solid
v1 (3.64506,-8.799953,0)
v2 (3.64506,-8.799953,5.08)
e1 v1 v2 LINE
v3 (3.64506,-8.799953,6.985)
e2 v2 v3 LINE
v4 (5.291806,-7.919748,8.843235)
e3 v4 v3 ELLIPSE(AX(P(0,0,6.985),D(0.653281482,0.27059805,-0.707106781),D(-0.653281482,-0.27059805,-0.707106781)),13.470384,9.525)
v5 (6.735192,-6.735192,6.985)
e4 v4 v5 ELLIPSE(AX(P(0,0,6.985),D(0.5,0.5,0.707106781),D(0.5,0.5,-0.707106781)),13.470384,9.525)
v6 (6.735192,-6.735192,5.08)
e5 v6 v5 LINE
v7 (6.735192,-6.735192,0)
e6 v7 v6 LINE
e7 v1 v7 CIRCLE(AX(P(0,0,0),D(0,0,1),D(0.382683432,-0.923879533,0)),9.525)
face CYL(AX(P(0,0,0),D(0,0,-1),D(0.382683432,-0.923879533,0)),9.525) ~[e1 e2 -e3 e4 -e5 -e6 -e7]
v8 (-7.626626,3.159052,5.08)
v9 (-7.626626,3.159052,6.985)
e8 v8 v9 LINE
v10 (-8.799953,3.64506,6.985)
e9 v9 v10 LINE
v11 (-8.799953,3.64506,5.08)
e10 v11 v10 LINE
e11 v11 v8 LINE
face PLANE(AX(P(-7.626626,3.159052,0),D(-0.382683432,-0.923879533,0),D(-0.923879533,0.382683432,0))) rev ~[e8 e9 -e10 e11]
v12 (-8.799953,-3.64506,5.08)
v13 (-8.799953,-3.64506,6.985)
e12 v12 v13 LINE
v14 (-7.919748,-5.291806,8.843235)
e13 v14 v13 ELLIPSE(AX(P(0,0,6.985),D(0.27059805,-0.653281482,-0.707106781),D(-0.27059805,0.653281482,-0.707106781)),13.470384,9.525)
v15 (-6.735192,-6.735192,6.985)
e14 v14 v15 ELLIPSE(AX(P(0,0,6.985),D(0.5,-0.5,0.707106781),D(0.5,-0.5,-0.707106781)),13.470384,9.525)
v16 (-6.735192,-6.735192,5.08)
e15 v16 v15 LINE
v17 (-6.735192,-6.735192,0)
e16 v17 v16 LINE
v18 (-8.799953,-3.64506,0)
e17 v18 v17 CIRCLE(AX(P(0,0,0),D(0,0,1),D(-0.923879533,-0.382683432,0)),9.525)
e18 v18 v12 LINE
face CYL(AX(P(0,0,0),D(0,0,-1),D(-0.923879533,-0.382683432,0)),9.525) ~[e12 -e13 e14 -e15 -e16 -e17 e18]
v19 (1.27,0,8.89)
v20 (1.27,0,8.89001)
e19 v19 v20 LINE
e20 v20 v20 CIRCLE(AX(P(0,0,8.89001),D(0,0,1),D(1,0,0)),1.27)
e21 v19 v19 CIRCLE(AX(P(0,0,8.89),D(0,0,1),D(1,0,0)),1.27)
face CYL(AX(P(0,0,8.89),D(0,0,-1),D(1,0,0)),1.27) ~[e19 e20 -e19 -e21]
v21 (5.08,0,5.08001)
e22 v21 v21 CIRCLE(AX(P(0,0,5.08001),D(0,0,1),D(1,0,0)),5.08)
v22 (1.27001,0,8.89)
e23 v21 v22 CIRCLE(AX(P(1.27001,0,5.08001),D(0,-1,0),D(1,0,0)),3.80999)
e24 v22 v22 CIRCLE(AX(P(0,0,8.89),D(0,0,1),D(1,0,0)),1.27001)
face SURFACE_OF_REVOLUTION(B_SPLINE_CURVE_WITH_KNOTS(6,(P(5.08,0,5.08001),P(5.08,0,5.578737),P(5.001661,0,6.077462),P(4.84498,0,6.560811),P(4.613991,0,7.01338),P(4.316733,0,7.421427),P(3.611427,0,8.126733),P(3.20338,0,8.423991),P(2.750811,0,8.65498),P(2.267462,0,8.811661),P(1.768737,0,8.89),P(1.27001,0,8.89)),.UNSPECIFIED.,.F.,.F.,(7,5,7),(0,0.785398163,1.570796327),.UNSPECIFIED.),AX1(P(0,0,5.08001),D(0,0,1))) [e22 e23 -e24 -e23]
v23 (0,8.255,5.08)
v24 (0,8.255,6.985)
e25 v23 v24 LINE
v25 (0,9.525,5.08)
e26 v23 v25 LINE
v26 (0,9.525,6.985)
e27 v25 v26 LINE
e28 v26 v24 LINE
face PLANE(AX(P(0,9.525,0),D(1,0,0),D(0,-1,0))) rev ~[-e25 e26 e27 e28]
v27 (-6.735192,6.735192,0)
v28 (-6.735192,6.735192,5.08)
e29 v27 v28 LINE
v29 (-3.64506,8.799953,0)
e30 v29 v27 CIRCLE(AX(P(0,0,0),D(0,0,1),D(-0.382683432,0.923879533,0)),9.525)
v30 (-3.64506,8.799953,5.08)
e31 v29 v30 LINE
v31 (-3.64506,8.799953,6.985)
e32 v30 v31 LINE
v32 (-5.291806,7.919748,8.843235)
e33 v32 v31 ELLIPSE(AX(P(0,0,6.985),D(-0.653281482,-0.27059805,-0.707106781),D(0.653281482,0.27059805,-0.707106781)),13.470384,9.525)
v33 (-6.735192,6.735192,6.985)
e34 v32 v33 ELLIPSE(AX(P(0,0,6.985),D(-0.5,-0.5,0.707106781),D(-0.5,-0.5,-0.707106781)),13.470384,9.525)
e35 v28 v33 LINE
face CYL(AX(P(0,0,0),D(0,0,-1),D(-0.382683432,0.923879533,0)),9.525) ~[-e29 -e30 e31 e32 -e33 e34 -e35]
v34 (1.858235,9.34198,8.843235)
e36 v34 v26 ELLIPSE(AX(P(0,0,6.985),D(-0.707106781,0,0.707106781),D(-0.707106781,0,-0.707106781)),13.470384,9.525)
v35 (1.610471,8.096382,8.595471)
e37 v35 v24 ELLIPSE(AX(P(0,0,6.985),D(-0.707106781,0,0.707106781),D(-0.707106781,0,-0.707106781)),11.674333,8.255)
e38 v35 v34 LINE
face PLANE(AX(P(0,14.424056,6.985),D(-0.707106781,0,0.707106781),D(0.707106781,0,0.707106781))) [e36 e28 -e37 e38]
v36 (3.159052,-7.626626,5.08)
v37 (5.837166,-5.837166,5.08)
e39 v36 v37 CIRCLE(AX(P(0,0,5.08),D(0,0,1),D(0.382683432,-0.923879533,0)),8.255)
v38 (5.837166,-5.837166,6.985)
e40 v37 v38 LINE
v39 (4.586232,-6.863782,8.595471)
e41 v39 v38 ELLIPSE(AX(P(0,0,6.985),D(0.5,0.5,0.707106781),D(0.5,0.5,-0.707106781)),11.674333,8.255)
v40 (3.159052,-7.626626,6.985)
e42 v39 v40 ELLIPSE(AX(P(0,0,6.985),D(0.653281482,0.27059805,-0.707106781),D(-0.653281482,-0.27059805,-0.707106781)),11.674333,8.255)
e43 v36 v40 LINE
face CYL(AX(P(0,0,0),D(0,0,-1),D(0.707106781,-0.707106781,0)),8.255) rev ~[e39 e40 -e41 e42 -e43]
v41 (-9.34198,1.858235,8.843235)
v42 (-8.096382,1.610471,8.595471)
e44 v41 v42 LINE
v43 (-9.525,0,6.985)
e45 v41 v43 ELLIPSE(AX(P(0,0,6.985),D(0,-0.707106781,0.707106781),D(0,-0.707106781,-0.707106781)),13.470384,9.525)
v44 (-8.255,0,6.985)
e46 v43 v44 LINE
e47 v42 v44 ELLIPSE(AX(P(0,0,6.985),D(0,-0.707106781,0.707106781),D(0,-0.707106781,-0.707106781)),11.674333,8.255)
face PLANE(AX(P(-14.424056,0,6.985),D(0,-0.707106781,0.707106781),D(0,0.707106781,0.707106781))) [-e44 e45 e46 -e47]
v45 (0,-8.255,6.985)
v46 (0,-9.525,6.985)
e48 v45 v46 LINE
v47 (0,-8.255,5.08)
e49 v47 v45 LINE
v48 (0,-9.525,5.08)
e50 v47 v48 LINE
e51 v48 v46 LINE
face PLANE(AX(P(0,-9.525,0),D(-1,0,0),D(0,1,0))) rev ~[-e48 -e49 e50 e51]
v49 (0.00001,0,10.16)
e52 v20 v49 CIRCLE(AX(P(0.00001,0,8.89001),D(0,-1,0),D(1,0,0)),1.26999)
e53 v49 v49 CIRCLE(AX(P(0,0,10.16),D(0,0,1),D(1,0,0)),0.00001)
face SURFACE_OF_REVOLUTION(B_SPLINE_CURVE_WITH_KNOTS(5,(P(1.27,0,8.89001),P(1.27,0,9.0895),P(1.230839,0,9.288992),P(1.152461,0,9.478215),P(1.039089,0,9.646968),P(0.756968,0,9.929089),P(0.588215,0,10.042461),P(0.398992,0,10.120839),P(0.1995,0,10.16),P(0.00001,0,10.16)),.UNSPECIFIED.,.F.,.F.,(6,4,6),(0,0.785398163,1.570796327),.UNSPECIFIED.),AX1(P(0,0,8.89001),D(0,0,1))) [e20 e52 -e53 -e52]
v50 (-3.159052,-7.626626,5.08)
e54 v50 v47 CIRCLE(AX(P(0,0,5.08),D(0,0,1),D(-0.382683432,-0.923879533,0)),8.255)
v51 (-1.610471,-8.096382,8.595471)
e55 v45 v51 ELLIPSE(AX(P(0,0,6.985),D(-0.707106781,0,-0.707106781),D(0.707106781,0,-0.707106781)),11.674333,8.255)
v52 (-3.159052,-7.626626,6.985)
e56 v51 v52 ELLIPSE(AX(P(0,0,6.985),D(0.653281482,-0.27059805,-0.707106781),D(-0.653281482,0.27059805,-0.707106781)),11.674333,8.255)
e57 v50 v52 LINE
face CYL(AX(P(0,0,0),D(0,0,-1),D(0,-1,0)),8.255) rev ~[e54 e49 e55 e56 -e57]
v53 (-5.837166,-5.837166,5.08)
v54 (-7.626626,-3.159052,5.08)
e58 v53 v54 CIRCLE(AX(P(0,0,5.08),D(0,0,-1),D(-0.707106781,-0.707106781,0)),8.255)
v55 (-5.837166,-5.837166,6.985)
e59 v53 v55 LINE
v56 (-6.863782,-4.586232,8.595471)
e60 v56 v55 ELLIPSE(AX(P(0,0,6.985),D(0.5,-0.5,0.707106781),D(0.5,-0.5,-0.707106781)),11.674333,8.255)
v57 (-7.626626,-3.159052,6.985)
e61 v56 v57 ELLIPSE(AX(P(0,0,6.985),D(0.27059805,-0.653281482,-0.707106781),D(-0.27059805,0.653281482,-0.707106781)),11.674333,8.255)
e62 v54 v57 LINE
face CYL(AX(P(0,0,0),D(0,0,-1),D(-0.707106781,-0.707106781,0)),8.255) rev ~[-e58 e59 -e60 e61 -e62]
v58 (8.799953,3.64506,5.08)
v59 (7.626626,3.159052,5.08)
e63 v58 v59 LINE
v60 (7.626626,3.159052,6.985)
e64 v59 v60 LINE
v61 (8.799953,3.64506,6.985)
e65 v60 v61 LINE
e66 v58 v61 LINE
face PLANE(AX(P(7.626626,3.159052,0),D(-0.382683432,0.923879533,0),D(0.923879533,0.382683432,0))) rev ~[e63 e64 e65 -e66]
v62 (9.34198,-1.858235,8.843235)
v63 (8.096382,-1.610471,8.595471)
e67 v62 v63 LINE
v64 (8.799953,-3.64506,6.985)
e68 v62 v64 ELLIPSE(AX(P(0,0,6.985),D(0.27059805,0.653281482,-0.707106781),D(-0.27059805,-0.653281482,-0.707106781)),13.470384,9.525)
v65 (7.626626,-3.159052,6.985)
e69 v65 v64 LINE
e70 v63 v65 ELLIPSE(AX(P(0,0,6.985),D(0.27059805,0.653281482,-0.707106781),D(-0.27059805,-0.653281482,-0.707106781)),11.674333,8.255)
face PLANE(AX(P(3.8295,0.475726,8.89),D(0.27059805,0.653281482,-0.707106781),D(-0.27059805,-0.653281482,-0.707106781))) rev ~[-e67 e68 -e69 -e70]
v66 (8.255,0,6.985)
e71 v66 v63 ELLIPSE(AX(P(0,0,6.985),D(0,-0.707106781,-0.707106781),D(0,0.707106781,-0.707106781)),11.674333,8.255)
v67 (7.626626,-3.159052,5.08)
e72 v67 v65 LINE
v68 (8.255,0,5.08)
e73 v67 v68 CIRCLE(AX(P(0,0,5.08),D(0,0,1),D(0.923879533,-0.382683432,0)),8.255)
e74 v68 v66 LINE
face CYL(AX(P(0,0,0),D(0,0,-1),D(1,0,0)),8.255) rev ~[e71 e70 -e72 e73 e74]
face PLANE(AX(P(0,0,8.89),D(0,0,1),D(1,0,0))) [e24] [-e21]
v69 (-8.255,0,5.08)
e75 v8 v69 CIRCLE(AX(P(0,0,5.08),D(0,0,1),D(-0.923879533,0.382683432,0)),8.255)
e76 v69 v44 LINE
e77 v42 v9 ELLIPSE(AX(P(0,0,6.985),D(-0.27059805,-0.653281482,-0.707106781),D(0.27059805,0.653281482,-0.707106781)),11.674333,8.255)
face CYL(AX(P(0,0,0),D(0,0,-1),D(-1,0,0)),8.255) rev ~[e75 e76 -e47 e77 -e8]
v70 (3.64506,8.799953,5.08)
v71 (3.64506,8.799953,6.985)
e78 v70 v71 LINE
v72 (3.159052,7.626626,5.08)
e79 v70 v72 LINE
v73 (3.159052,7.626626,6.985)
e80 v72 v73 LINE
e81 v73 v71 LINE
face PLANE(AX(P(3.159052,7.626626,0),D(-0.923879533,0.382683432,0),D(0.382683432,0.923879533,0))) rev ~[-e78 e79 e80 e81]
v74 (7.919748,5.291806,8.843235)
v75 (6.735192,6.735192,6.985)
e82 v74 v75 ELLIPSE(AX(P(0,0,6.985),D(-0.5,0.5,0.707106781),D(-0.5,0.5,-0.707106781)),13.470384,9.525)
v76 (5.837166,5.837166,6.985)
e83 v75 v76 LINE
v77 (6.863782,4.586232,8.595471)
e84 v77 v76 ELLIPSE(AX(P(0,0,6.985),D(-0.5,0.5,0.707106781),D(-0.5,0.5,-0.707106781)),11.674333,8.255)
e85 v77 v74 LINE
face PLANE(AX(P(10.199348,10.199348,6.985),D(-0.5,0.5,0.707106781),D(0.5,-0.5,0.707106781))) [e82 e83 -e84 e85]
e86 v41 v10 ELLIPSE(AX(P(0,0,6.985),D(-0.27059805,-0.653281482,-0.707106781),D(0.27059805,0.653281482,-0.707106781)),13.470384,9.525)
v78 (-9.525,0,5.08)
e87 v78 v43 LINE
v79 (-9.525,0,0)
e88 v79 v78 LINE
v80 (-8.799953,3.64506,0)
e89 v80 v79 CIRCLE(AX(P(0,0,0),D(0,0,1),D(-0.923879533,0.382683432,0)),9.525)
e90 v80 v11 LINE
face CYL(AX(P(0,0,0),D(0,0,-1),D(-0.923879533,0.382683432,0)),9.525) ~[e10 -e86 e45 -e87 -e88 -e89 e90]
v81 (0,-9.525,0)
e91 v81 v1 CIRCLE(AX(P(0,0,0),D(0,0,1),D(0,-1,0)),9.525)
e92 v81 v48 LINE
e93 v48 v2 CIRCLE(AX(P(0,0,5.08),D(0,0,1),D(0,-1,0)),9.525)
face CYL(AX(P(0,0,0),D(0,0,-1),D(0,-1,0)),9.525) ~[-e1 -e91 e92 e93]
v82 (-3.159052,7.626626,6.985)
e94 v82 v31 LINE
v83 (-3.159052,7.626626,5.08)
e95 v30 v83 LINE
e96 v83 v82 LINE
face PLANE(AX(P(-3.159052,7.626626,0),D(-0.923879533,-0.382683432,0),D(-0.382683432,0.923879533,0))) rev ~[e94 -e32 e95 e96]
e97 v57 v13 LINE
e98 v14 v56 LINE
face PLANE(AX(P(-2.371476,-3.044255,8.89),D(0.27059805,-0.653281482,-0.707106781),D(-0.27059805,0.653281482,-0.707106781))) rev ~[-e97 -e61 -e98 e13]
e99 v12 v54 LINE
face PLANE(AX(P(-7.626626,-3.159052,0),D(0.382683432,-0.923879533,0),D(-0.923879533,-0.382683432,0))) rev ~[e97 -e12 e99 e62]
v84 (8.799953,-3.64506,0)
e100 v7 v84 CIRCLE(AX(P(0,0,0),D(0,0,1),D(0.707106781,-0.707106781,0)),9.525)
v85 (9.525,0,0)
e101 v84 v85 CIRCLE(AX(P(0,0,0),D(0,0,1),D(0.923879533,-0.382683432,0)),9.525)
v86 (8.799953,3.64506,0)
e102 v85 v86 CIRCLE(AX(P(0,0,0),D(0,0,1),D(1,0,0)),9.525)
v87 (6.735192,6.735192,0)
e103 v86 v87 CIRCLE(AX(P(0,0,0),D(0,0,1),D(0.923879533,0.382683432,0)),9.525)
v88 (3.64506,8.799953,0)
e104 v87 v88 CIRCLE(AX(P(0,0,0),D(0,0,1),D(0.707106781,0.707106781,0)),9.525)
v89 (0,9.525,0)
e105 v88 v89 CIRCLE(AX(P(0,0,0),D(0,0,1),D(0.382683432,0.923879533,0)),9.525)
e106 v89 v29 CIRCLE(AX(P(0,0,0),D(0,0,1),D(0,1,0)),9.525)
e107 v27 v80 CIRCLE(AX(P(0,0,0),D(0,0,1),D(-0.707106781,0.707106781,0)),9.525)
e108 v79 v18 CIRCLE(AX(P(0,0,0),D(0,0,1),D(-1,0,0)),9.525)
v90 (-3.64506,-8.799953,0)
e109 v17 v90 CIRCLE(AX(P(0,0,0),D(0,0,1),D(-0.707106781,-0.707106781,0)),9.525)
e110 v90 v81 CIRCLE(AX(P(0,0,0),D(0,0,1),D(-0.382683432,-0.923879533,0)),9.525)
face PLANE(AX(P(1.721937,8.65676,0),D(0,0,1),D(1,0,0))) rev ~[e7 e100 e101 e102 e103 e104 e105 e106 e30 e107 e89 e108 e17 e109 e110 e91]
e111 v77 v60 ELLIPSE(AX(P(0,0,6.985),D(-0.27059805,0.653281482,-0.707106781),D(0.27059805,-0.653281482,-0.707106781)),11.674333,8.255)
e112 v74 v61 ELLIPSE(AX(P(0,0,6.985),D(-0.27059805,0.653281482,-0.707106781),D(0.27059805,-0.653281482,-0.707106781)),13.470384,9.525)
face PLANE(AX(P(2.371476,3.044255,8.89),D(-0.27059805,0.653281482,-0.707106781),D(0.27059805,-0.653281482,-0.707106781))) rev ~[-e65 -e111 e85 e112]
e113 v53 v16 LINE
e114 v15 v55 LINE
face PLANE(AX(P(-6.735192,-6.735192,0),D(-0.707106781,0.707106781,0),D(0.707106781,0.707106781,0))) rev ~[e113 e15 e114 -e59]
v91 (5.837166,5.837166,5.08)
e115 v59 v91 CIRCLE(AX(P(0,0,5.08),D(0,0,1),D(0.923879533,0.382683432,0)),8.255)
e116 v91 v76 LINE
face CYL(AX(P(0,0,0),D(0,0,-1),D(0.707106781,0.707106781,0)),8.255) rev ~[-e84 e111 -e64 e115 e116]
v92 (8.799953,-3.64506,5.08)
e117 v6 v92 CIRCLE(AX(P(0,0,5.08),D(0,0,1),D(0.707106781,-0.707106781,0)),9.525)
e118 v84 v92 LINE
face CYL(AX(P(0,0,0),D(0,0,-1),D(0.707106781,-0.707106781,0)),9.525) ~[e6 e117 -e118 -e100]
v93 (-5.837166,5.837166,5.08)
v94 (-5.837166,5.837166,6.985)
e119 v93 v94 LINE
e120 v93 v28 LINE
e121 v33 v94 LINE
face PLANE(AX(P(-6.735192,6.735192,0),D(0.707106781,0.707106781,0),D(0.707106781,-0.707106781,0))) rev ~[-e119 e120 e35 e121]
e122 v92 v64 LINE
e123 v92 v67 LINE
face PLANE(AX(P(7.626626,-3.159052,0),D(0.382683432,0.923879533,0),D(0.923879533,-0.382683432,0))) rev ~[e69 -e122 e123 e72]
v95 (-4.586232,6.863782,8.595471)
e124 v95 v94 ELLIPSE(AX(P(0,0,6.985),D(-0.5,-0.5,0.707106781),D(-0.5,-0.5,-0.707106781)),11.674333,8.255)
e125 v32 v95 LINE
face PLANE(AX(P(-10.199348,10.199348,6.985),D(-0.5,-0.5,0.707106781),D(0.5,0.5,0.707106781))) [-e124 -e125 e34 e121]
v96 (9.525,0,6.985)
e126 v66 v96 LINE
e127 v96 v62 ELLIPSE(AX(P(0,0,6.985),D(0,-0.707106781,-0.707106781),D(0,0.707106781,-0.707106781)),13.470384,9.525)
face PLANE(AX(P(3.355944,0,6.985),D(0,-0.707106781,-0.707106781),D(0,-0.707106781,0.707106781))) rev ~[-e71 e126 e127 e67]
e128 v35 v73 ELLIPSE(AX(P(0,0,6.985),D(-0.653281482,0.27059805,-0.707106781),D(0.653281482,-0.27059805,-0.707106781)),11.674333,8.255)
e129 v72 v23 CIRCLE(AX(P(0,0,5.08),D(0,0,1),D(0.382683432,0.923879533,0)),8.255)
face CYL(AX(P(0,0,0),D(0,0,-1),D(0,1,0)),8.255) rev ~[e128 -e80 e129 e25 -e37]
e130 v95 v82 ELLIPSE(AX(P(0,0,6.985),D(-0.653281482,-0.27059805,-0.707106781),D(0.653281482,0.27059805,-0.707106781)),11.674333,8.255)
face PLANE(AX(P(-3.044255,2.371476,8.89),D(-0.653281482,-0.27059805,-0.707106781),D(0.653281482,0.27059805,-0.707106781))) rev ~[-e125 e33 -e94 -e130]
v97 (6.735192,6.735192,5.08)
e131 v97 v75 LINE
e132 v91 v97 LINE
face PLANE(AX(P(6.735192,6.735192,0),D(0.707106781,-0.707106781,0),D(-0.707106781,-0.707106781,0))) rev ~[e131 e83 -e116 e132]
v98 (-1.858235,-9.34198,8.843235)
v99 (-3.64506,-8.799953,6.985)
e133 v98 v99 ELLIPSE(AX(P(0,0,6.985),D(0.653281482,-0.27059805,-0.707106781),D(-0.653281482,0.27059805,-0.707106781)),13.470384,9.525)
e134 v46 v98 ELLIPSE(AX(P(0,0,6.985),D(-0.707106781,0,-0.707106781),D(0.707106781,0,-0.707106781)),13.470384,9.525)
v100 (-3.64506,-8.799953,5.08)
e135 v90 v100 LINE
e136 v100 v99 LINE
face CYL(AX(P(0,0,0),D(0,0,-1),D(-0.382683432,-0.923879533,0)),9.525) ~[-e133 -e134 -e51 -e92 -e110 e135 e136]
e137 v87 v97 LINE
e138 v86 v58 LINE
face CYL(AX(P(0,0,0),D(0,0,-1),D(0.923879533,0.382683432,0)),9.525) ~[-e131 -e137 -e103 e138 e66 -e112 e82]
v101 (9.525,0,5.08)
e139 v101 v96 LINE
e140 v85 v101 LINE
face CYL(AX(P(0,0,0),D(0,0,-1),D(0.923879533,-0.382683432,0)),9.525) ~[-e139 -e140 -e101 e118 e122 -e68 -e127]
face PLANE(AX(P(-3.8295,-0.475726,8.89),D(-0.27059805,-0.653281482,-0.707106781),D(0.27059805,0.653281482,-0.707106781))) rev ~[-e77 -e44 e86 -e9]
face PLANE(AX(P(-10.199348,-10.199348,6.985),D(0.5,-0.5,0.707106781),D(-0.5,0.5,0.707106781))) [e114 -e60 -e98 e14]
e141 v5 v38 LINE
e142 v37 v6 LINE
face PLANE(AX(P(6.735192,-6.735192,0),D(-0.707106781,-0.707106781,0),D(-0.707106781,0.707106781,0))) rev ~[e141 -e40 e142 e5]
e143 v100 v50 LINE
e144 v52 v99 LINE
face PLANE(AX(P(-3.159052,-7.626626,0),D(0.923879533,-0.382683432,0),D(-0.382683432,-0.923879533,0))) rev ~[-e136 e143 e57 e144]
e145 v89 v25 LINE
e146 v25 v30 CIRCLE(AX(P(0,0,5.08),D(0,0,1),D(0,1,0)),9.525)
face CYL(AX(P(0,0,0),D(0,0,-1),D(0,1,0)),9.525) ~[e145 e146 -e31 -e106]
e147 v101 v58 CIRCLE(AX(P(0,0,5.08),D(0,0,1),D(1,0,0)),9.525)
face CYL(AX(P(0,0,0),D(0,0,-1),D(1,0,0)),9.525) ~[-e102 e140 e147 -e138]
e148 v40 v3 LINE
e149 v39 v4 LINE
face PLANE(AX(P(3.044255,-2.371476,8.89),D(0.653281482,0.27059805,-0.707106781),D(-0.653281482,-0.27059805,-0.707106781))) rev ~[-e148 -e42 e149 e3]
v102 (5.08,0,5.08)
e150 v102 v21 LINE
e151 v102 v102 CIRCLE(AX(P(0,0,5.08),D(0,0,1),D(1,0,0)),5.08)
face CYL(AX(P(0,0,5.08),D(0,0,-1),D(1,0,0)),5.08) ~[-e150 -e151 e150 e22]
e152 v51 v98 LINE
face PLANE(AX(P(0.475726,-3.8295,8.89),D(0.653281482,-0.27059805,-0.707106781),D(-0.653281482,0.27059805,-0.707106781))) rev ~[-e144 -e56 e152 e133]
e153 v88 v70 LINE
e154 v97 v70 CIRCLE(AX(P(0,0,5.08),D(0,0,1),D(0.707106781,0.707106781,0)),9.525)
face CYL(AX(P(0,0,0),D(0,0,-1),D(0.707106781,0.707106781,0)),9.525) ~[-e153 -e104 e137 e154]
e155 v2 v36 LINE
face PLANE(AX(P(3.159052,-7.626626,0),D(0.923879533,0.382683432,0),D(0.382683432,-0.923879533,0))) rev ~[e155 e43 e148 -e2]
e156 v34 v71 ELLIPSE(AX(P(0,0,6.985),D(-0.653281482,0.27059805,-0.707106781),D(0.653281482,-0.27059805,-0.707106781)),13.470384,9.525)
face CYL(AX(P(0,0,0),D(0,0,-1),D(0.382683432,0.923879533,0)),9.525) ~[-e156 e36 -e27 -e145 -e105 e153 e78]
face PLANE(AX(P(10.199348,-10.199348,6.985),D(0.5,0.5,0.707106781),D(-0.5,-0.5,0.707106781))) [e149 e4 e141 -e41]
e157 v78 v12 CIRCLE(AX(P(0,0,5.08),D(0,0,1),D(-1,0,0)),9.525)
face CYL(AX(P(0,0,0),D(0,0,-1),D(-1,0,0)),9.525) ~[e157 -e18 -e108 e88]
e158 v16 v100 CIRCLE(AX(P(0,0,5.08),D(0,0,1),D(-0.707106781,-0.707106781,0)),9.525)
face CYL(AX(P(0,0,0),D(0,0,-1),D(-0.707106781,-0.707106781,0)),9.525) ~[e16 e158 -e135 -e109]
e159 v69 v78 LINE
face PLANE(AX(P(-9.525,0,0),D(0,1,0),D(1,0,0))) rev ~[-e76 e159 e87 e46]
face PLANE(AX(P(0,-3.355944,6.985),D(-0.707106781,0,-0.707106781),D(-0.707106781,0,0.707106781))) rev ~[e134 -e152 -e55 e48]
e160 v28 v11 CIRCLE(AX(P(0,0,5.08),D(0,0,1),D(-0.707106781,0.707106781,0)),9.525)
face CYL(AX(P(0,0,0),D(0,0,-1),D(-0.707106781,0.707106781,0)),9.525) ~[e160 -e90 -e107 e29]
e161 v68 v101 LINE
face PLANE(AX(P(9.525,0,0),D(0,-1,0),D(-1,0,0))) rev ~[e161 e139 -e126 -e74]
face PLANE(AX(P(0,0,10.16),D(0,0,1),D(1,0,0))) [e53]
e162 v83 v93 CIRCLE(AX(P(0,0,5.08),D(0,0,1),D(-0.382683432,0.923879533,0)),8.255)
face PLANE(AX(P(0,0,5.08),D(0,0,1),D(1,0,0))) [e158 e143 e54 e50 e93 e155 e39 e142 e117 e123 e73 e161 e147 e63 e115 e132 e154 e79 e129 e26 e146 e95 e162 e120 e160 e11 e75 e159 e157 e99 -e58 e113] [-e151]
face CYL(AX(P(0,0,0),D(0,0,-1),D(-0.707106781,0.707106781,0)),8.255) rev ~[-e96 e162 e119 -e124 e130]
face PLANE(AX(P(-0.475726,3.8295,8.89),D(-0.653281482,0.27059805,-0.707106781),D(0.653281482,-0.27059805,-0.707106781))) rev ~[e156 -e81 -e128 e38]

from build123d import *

# Parameters (mm, degrees)
F1_DEPTH     = 5.08
F2_DEPTH     = 8.89
F3_T1_DEPTH  = 11.0681121842
F3_T3_DEPTH  = 11.0681121842
F3_T5_DEPTH  = 11.0681121842
F3_T7_DEPTH  = 11.0681121842
F3_T9_DEPTH  = 11.0681121842
F3_T11_DEPTH = 11.0681121842
F3_T13_DEPTH = 11.0681121842
F3_T15_DEPTH = 11.0681121842
F3_T17_DEPTH = 11.0681121842
F3_T19_DEPTH = 11.0681121842
F3_T21_DEPTH = 11.0681121842
F3_T23_DEPTH = 11.0681121842
F3_T25_DEPTH = 11.0681121842
F3_T27_DEPTH = 11.0681121842
F3_T29_DEPTH = 11.0681121842
F3_T31_DEPTH = 11.0681121842
F4_R         = 5.08
F5_DEPTH     = 3.81
F6_R         = 3.80999
F7_R         = 1.27
F8_DEPTH     = 1.27
F9_R         = 1.26999


# Not quite as in the source:
# - a fillet or chamfer that OpenCascade refuses, or shapes differently, is made with other operations: its cross-section is extruded or revolved along the edge and cut away or added
# - a fillet or chamfer is up to 0.001 mm smaller than in the source, because OpenCascade refuses the exact size
# - a feature names something its author has since deleted; it is built from what else it names


with BuildPart() as f1:
    # F0 (on Top) → F1 (new body)
    with BuildSketch(Plane.XY):
        with BuildLine():
            Line((8.255, 0), (9.525, 0))
            ThreePointArc((9.525, 0), (9.3419797958, 1.8582353172), (8.7999525472, 3.6450596933))
            Line((8.7999525472, 3.6450596933), (7.6266255409, 3.1590517342))
            ThreePointArc((7.6266255409, 3.1590517342), (6.8637816496, 4.5862322736), (5.8371664787, 5.8371664787))
            Line((5.8371664787, 5.8371664787), (6.7351920908, 6.7351920908))
            ThreePointArc((6.7351920908, 6.7351920908), (5.2918064695, 7.9197480572), (3.6450596933, 8.7999525472))
            Line((3.6450596933, 8.7999525472), (3.1590517342, 7.6266255409))
            ThreePointArc((3.1590517342, 7.6266255409), (1.6104706082, 8.0963824897), (0, 8.255))
            Line((0, 8.255), (0, 9.525))
            ThreePointArc((0, 9.525), (-1.8582353172, 9.3419797958), (-3.6450596933, 8.7999525472))
            Line((-3.6450596933, 8.7999525472), (-3.1590517342, 7.6266255409))
            ThreePointArc((-3.1590517342, 7.6266255409), (-4.5862322736, 6.8637816496), (-5.8371664787, 5.8371664787))
            Line((-5.8371664787, 5.8371664787), (-6.7351920908, 6.7351920908))
            ThreePointArc((-6.7351920908, 6.7351920908), (-7.9197480572, 5.2918064695), (-8.7999525472, 3.6450596933))
            Line((-8.7999525472, 3.6450596933), (-7.6266255409, 3.1590517342))
            ThreePointArc((-7.6266255409, 3.1590517342), (-8.0963824897, 1.6104706082), (-8.255, 0))
            Line((-8.255, 0), (-9.525, 0))
            ThreePointArc((-9.525, 0), (-9.3419797958, -1.8582353172), (-8.7999525472, -3.6450596933))
            Line((-8.7999525472, -3.6450596933), (-7.6266255409, -3.1590517342))
            ThreePointArc((-7.6266255409, -3.1590517342), (-6.8637816496, -4.5862322736), (-5.8371664787, -5.8371664787))
            Line((-5.8371664787, -5.8371664787), (-6.7351920908, -6.7351920908))
            ThreePointArc((-6.7351920908, -6.7351920908), (-5.2918064695, -7.9197480572), (-3.6450596933, -8.7999525472))
            Line((-3.6450596933, -8.7999525472), (-3.1590517342, -7.6266255409))
            ThreePointArc((-3.1590517342, -7.6266255409), (-1.6104706082, -8.0963824897), (0, -8.255))
            Line((0, -8.255), (0, -9.525))
            ThreePointArc((0, -9.525), (1.8582353172, -9.3419797958), (3.6450596933, -8.7999525472))
            Line((3.6450596933, -8.7999525472), (3.1590517342, -7.6266255409))
            ThreePointArc((3.1590517342, -7.6266255409), (4.5862322736, -6.8637816496), (5.8371664787, -5.8371664787))
            Line((5.8371664787, -5.8371664787), (6.7351920908, -6.7351920908))
            ThreePointArc((6.7351920908, -6.7351920908), (7.9197480572, -5.2918064695), (8.7999525472, -3.6450596933))
            Line((8.7999525472, -3.6450596933), (7.6266255409, -3.1590517342))
            ThreePointArc((7.6266255409, -3.1590517342), (8.0963824897, -1.6104706082), (8.255, 0))
        make_face()
        with BuildLine():
            ThreePointArc((-8.7999525472, -3.6450596933), (-7.9197480572, -5.2918064695), (-6.7351920908, -6.7351920908))
            Line((-6.7351920908, -6.7351920908), (-5.8371664787, -5.8371664787))
            ThreePointArc((-5.8371664787, -5.8371664787), (-6.8637816496, -4.5862322736), (-7.6266255409, -3.1590517342))
            Line((-7.6266255409, -3.1590517342), (-8.7999525472, -3.6450596933))
        make_face()
    extrude(amount=F1_DEPTH)

    # F0 (on Top) → F2 (join)
    with BuildSketch(Plane.XY):
        with BuildLine():
            Line((3.1590517342, 7.6266255409), (3.6450596933, 8.7999525472))
            ThreePointArc((3.6450596933, 8.7999525472), (1.8582353172, 9.3419797958), (0, 9.525))
            Line((0, 9.525), (0, 8.255))
            ThreePointArc((0, 8.255), (1.6104706082, 8.0963824897), (3.1590517342, 7.6266255409))
        make_face()
        with BuildLine():
            Line((7.6266255409, 3.1590517342), (8.7999525472, 3.6450596933))
            ThreePointArc((8.7999525472, 3.6450596933), (7.9197480572, 5.2918064695), (6.7351920908, 6.7351920908))
            Line((6.7351920908, 6.7351920908), (5.8371664787, 5.8371664787))
            ThreePointArc((5.8371664787, 5.8371664787), (6.8637816496, 4.5862322736), (7.6266255409, 3.1590517342))
        make_face()
        with BuildLine():
            ThreePointArc((3.6450596933, -8.7999525472), (5.2918064695, -7.9197480572), (6.7351920908, -6.7351920908))
            Line((6.7351920908, -6.7351920908), (5.8371664787, -5.8371664787))
            ThreePointArc((5.8371664787, -5.8371664787), (4.5862322736, -6.8637816496), (3.1590517342, -7.6266255409))
            Line((3.1590517342, -7.6266255409), (3.6450596933, -8.7999525472))
        make_face()
        with BuildLine():
            ThreePointArc((8.7999525472, -3.6450596933), (9.3419797958, -1.8582353172), (9.525, 0))
            Line((9.525, 0), (8.255, 0))
            ThreePointArc((8.255, 0), (8.0963824897, -1.6104706082), (7.6266255409, -3.1590517342))
            Line((7.6266255409, -3.1590517342), (8.7999525472, -3.6450596933))
        make_face()
        with BuildLine():
            ThreePointArc((-3.6450596933, -8.7999525472), (-1.8582353172, -9.3419797958), (0, -9.525))
            Line((0, -9.525), (0, -8.255))
            ThreePointArc((0, -8.255), (-1.6104706082, -8.0963824897), (-3.1590517342, -7.6266255409))
            Line((-3.1590517342, -7.6266255409), (-3.6450596933, -8.7999525472))
        make_face()
        with BuildLine():
            ThreePointArc((-8.7999525472, -3.6450596933), (-7.9197480572, -5.2918064695), (-6.7351920908, -6.7351920908))
            Line((-6.7351920908, -6.7351920908), (-5.8371664787, -5.8371664787))
            ThreePointArc((-5.8371664787, -5.8371664787), (-6.8637816496, -4.5862322736), (-7.6266255409, -3.1590517342))
            Line((-7.6266255409, -3.1590517342), (-8.7999525472, -3.6450596933))
        make_face()
        with BuildLine():
            Line((-7.6266255409, 3.1590517342), (-8.7999525472, 3.6450596933))
            ThreePointArc((-8.7999525472, 3.6450596933), (-9.3419797958, 1.8582353172), (-9.525, 0))
            Line((-9.525, 0), (-8.255, 0))
            ThreePointArc((-8.255, 0), (-8.0963824897, 1.6104706082), (-7.6266255409, 3.1590517342))
        make_face()
        with BuildLine():
            Line((-3.1590517342, 7.6266255409), (-3.6450596933, 8.7999525472))
            ThreePointArc((-3.6450596933, 8.7999525472), (-5.2918064695, 7.9197480572), (-6.7351920908, 6.7351920908))
            Line((-6.7351920908, 6.7351920908), (-5.8371664787, 5.8371664787))
            ThreePointArc((-5.8371664787, 5.8371664787), (-4.5862322736, 6.8637816496), (-3.1590517342, 7.6266255409))
        make_face()
    extrude(amount=F2_DEPTH)

    # F3: chamfer of 1.905 on 16 edges, made by hand

    # F3_s2 → F3_t1 (cut)
    with BuildSketch(Plane(origin=(1.2842641335, 3.1004878888, 0), x_dir=(0, 0, 1), z_dir=(0.3826834324, 0.9238795325, 0))):
        Polygon((8.89, -1.905), (6.985, 0), (8.89, 0), align=None)
    extrude(amount=F3_T1_DEPTH, mode=Mode.SUBTRACT)

    # F3_s4 → F3_t3 (cut)
    with BuildSketch(Plane.XZ.offset(-14.4240560921)):
        Polygon((0, 6.985), (1.905, 8.89), (0, 8.89), align=None)
    extrude(amount=F3_T3_DEPTH, mode=Mode.SUBTRACT)

    # F3_s6 → F3_t5 (cut)
    with BuildSketch(Plane(origin=(3.1004878888, 1.2842641335, 0), x_dir=(0, 0, 1), z_dir=(0.9238795325, 0.3826834324, 0))):
        Polygon((8.89, -1.905), (6.985, 0), (8.89, 0), align=None)
    extrude(amount=F3_T5_DEPTH, mode=Mode.SUBTRACT)

    # F3_s8 → F3_t7 (cut)
    with BuildSketch(Plane(origin=(10.1993478749, 10.1993478749, 0), x_dir=(0, 0, 1), z_dir=(-0.7071067812, -0.7071067812, 0))):
        Polygon((6.985, 0), (8.89, -1.905), (8.89, 0), align=None)
    extrude(amount=F3_T7_DEPTH, mode=Mode.SUBTRACT)

    # F3_s10 → F3_t9 (cut)
    with BuildSketch(Plane(origin=(1.2842641335, -3.1004878888, 0), x_dir=(0, 0, 1), z_dir=(0.3826834324, -0.9238795325, 0))):
        Polygon((8.89, -1.905), (6.985, 0), (8.89, 0), align=None)
    extrude(amount=F3_T9_DEPTH, mode=Mode.SUBTRACT)

    # F3_s12 → F3_t11 (cut)
    with BuildSketch(Plane(origin=(10.1993478749, -10.1993478749, 0), x_dir=(0, 0, 1), z_dir=(-0.7071067812, 0.7071067812, 0))):
        Polygon((6.985, 0), (8.89, -1.905), (8.89, 0), align=None)
    extrude(amount=F3_T11_DEPTH, mode=Mode.SUBTRACT)

    # F3_s14 → F3_t13 (cut)
    with BuildSketch(Plane(origin=(3.1004878888, -1.2842641335, 0), x_dir=(0, 0, 1), z_dir=(0.9238795325, -0.3826834324, 0))):
        Polygon((8.89, -1.905), (6.985, 0), (8.89, 0), align=None)
    extrude(amount=F3_T13_DEPTH, mode=Mode.SUBTRACT)

    # F3_s16 → F3_t15 (cut)
    with BuildSketch(Plane.YZ.offset(3.3559439079)):
        Polygon((0, 6.985), (-1.905, 8.89), (0, 8.89), align=None)
    extrude(amount=F3_T15_DEPTH, mode=Mode.SUBTRACT)

    # F3_s18 → F3_t17 (cut)
    with BuildSketch(Plane.XZ.offset(3.3559439079)):
        Polygon((0, 6.985), (-1.905, 8.89), (0, 8.89), align=None)
    extrude(amount=F3_T17_DEPTH, mode=Mode.SUBTRACT)

    # F3_s20 → F3_t19 (cut)
    with BuildSketch(Plane(origin=(-1.2842641335, -3.1004878888, 0), x_dir=(0, 0, 1), z_dir=(-0.3826834324, -0.9238795325, 0))):
        Polygon((8.89, -1.905), (6.985, 0), (8.89, 0), align=None)
    extrude(amount=F3_T19_DEPTH, mode=Mode.SUBTRACT)

    # F3_s22 → F3_t21 (cut)
    with BuildSketch(Plane(origin=(-10.1993478749, -10.1993478749, 0), x_dir=(0, 0, 1), z_dir=(0.7071067812, 0.7071067812, 0))):
        Polygon((6.985, 0), (8.89, -1.905), (8.89, 0), align=None)
    extrude(amount=F3_T21_DEPTH, mode=Mode.SUBTRACT)

    # F3_s24 → F3_t23 (cut)
    with BuildSketch(Plane(origin=(-3.1004878888, -1.2842641335, 0), x_dir=(0, 0, 1), z_dir=(-0.9238795325, -0.3826834324, 0))):
        Polygon((8.89, -1.905), (6.985, 0), (8.89, 0), align=None)
    extrude(amount=F3_T23_DEPTH, mode=Mode.SUBTRACT)

    # F3_s26 → F3_t25 (cut)
    with BuildSketch(Plane.YZ.offset(-14.4240560921)):
        Polygon((0, 6.985), (1.905, 8.89), (0, 8.89), align=None)
    extrude(amount=F3_T25_DEPTH, mode=Mode.SUBTRACT)

    # F3_s28 → F3_t27 (cut)
    with BuildSketch(Plane(origin=(-3.1004878888, 1.2842641335, 0), x_dir=(0, 0, 1), z_dir=(-0.9238795325, 0.3826834324, 0))):
        Polygon((8.89, -1.905), (6.985, 0), (8.89, 0), align=None)
    extrude(amount=F3_T27_DEPTH, mode=Mode.SUBTRACT)

    # F3_s30 → F3_t29 (cut)
    with BuildSketch(Plane(origin=(-10.1993478749, 10.1993478749, 0), x_dir=(0, 0, 1), z_dir=(0.7071067812, -0.7071067812, 0))):
        Polygon((6.985, 0), (8.89, -1.905), (8.89, 0), align=None)
    extrude(amount=F3_T29_DEPTH, mode=Mode.SUBTRACT)

    # F3_s32 → F3_t31 (cut)
    with BuildSketch(Plane(origin=(-1.2842641335, 3.1004878888, 0), x_dir=(0, 0, 1), z_dir=(-0.3826834324, 0.9238795325, 0))):
        Polygon((8.89, -1.905), (6.985, 0), (8.89, 0), align=None)
    extrude(amount=F3_T31_DEPTH, mode=Mode.SUBTRACT)

    # F4 (on face) → F5 (join)
    with BuildSketch(Plane.XY.offset(5.08)):
        Circle(F4_R)
    extrude(amount=F5_DEPTH)

    # F6 (radius 3.81 in the source; OpenCascade refuses exactly that, so slightly less here)
    f6_edges = [f1.edges().sort_by_distance(p)[0] for p in [
        (-5.08, 0, 8.89),
    ]]
    fillet(f6_edges, radius=F6_R)

    # F7 (on face) → F8 (join)
    with BuildSketch(Plane.XY.offset(8.89)):
        Circle(F7_R)
    extrude(amount=F8_DEPTH)

    # F9 (radius 1.27 in the source; OpenCascade refuses exactly that, so slightly less here)
    f9_edges = [f1.edges().sort_by_distance(p)[0] for p in [
        (-1.27, 0, 10.16),
    ]]
    fillet(f9_edges, radius=F9_R)


solid = f1.part
